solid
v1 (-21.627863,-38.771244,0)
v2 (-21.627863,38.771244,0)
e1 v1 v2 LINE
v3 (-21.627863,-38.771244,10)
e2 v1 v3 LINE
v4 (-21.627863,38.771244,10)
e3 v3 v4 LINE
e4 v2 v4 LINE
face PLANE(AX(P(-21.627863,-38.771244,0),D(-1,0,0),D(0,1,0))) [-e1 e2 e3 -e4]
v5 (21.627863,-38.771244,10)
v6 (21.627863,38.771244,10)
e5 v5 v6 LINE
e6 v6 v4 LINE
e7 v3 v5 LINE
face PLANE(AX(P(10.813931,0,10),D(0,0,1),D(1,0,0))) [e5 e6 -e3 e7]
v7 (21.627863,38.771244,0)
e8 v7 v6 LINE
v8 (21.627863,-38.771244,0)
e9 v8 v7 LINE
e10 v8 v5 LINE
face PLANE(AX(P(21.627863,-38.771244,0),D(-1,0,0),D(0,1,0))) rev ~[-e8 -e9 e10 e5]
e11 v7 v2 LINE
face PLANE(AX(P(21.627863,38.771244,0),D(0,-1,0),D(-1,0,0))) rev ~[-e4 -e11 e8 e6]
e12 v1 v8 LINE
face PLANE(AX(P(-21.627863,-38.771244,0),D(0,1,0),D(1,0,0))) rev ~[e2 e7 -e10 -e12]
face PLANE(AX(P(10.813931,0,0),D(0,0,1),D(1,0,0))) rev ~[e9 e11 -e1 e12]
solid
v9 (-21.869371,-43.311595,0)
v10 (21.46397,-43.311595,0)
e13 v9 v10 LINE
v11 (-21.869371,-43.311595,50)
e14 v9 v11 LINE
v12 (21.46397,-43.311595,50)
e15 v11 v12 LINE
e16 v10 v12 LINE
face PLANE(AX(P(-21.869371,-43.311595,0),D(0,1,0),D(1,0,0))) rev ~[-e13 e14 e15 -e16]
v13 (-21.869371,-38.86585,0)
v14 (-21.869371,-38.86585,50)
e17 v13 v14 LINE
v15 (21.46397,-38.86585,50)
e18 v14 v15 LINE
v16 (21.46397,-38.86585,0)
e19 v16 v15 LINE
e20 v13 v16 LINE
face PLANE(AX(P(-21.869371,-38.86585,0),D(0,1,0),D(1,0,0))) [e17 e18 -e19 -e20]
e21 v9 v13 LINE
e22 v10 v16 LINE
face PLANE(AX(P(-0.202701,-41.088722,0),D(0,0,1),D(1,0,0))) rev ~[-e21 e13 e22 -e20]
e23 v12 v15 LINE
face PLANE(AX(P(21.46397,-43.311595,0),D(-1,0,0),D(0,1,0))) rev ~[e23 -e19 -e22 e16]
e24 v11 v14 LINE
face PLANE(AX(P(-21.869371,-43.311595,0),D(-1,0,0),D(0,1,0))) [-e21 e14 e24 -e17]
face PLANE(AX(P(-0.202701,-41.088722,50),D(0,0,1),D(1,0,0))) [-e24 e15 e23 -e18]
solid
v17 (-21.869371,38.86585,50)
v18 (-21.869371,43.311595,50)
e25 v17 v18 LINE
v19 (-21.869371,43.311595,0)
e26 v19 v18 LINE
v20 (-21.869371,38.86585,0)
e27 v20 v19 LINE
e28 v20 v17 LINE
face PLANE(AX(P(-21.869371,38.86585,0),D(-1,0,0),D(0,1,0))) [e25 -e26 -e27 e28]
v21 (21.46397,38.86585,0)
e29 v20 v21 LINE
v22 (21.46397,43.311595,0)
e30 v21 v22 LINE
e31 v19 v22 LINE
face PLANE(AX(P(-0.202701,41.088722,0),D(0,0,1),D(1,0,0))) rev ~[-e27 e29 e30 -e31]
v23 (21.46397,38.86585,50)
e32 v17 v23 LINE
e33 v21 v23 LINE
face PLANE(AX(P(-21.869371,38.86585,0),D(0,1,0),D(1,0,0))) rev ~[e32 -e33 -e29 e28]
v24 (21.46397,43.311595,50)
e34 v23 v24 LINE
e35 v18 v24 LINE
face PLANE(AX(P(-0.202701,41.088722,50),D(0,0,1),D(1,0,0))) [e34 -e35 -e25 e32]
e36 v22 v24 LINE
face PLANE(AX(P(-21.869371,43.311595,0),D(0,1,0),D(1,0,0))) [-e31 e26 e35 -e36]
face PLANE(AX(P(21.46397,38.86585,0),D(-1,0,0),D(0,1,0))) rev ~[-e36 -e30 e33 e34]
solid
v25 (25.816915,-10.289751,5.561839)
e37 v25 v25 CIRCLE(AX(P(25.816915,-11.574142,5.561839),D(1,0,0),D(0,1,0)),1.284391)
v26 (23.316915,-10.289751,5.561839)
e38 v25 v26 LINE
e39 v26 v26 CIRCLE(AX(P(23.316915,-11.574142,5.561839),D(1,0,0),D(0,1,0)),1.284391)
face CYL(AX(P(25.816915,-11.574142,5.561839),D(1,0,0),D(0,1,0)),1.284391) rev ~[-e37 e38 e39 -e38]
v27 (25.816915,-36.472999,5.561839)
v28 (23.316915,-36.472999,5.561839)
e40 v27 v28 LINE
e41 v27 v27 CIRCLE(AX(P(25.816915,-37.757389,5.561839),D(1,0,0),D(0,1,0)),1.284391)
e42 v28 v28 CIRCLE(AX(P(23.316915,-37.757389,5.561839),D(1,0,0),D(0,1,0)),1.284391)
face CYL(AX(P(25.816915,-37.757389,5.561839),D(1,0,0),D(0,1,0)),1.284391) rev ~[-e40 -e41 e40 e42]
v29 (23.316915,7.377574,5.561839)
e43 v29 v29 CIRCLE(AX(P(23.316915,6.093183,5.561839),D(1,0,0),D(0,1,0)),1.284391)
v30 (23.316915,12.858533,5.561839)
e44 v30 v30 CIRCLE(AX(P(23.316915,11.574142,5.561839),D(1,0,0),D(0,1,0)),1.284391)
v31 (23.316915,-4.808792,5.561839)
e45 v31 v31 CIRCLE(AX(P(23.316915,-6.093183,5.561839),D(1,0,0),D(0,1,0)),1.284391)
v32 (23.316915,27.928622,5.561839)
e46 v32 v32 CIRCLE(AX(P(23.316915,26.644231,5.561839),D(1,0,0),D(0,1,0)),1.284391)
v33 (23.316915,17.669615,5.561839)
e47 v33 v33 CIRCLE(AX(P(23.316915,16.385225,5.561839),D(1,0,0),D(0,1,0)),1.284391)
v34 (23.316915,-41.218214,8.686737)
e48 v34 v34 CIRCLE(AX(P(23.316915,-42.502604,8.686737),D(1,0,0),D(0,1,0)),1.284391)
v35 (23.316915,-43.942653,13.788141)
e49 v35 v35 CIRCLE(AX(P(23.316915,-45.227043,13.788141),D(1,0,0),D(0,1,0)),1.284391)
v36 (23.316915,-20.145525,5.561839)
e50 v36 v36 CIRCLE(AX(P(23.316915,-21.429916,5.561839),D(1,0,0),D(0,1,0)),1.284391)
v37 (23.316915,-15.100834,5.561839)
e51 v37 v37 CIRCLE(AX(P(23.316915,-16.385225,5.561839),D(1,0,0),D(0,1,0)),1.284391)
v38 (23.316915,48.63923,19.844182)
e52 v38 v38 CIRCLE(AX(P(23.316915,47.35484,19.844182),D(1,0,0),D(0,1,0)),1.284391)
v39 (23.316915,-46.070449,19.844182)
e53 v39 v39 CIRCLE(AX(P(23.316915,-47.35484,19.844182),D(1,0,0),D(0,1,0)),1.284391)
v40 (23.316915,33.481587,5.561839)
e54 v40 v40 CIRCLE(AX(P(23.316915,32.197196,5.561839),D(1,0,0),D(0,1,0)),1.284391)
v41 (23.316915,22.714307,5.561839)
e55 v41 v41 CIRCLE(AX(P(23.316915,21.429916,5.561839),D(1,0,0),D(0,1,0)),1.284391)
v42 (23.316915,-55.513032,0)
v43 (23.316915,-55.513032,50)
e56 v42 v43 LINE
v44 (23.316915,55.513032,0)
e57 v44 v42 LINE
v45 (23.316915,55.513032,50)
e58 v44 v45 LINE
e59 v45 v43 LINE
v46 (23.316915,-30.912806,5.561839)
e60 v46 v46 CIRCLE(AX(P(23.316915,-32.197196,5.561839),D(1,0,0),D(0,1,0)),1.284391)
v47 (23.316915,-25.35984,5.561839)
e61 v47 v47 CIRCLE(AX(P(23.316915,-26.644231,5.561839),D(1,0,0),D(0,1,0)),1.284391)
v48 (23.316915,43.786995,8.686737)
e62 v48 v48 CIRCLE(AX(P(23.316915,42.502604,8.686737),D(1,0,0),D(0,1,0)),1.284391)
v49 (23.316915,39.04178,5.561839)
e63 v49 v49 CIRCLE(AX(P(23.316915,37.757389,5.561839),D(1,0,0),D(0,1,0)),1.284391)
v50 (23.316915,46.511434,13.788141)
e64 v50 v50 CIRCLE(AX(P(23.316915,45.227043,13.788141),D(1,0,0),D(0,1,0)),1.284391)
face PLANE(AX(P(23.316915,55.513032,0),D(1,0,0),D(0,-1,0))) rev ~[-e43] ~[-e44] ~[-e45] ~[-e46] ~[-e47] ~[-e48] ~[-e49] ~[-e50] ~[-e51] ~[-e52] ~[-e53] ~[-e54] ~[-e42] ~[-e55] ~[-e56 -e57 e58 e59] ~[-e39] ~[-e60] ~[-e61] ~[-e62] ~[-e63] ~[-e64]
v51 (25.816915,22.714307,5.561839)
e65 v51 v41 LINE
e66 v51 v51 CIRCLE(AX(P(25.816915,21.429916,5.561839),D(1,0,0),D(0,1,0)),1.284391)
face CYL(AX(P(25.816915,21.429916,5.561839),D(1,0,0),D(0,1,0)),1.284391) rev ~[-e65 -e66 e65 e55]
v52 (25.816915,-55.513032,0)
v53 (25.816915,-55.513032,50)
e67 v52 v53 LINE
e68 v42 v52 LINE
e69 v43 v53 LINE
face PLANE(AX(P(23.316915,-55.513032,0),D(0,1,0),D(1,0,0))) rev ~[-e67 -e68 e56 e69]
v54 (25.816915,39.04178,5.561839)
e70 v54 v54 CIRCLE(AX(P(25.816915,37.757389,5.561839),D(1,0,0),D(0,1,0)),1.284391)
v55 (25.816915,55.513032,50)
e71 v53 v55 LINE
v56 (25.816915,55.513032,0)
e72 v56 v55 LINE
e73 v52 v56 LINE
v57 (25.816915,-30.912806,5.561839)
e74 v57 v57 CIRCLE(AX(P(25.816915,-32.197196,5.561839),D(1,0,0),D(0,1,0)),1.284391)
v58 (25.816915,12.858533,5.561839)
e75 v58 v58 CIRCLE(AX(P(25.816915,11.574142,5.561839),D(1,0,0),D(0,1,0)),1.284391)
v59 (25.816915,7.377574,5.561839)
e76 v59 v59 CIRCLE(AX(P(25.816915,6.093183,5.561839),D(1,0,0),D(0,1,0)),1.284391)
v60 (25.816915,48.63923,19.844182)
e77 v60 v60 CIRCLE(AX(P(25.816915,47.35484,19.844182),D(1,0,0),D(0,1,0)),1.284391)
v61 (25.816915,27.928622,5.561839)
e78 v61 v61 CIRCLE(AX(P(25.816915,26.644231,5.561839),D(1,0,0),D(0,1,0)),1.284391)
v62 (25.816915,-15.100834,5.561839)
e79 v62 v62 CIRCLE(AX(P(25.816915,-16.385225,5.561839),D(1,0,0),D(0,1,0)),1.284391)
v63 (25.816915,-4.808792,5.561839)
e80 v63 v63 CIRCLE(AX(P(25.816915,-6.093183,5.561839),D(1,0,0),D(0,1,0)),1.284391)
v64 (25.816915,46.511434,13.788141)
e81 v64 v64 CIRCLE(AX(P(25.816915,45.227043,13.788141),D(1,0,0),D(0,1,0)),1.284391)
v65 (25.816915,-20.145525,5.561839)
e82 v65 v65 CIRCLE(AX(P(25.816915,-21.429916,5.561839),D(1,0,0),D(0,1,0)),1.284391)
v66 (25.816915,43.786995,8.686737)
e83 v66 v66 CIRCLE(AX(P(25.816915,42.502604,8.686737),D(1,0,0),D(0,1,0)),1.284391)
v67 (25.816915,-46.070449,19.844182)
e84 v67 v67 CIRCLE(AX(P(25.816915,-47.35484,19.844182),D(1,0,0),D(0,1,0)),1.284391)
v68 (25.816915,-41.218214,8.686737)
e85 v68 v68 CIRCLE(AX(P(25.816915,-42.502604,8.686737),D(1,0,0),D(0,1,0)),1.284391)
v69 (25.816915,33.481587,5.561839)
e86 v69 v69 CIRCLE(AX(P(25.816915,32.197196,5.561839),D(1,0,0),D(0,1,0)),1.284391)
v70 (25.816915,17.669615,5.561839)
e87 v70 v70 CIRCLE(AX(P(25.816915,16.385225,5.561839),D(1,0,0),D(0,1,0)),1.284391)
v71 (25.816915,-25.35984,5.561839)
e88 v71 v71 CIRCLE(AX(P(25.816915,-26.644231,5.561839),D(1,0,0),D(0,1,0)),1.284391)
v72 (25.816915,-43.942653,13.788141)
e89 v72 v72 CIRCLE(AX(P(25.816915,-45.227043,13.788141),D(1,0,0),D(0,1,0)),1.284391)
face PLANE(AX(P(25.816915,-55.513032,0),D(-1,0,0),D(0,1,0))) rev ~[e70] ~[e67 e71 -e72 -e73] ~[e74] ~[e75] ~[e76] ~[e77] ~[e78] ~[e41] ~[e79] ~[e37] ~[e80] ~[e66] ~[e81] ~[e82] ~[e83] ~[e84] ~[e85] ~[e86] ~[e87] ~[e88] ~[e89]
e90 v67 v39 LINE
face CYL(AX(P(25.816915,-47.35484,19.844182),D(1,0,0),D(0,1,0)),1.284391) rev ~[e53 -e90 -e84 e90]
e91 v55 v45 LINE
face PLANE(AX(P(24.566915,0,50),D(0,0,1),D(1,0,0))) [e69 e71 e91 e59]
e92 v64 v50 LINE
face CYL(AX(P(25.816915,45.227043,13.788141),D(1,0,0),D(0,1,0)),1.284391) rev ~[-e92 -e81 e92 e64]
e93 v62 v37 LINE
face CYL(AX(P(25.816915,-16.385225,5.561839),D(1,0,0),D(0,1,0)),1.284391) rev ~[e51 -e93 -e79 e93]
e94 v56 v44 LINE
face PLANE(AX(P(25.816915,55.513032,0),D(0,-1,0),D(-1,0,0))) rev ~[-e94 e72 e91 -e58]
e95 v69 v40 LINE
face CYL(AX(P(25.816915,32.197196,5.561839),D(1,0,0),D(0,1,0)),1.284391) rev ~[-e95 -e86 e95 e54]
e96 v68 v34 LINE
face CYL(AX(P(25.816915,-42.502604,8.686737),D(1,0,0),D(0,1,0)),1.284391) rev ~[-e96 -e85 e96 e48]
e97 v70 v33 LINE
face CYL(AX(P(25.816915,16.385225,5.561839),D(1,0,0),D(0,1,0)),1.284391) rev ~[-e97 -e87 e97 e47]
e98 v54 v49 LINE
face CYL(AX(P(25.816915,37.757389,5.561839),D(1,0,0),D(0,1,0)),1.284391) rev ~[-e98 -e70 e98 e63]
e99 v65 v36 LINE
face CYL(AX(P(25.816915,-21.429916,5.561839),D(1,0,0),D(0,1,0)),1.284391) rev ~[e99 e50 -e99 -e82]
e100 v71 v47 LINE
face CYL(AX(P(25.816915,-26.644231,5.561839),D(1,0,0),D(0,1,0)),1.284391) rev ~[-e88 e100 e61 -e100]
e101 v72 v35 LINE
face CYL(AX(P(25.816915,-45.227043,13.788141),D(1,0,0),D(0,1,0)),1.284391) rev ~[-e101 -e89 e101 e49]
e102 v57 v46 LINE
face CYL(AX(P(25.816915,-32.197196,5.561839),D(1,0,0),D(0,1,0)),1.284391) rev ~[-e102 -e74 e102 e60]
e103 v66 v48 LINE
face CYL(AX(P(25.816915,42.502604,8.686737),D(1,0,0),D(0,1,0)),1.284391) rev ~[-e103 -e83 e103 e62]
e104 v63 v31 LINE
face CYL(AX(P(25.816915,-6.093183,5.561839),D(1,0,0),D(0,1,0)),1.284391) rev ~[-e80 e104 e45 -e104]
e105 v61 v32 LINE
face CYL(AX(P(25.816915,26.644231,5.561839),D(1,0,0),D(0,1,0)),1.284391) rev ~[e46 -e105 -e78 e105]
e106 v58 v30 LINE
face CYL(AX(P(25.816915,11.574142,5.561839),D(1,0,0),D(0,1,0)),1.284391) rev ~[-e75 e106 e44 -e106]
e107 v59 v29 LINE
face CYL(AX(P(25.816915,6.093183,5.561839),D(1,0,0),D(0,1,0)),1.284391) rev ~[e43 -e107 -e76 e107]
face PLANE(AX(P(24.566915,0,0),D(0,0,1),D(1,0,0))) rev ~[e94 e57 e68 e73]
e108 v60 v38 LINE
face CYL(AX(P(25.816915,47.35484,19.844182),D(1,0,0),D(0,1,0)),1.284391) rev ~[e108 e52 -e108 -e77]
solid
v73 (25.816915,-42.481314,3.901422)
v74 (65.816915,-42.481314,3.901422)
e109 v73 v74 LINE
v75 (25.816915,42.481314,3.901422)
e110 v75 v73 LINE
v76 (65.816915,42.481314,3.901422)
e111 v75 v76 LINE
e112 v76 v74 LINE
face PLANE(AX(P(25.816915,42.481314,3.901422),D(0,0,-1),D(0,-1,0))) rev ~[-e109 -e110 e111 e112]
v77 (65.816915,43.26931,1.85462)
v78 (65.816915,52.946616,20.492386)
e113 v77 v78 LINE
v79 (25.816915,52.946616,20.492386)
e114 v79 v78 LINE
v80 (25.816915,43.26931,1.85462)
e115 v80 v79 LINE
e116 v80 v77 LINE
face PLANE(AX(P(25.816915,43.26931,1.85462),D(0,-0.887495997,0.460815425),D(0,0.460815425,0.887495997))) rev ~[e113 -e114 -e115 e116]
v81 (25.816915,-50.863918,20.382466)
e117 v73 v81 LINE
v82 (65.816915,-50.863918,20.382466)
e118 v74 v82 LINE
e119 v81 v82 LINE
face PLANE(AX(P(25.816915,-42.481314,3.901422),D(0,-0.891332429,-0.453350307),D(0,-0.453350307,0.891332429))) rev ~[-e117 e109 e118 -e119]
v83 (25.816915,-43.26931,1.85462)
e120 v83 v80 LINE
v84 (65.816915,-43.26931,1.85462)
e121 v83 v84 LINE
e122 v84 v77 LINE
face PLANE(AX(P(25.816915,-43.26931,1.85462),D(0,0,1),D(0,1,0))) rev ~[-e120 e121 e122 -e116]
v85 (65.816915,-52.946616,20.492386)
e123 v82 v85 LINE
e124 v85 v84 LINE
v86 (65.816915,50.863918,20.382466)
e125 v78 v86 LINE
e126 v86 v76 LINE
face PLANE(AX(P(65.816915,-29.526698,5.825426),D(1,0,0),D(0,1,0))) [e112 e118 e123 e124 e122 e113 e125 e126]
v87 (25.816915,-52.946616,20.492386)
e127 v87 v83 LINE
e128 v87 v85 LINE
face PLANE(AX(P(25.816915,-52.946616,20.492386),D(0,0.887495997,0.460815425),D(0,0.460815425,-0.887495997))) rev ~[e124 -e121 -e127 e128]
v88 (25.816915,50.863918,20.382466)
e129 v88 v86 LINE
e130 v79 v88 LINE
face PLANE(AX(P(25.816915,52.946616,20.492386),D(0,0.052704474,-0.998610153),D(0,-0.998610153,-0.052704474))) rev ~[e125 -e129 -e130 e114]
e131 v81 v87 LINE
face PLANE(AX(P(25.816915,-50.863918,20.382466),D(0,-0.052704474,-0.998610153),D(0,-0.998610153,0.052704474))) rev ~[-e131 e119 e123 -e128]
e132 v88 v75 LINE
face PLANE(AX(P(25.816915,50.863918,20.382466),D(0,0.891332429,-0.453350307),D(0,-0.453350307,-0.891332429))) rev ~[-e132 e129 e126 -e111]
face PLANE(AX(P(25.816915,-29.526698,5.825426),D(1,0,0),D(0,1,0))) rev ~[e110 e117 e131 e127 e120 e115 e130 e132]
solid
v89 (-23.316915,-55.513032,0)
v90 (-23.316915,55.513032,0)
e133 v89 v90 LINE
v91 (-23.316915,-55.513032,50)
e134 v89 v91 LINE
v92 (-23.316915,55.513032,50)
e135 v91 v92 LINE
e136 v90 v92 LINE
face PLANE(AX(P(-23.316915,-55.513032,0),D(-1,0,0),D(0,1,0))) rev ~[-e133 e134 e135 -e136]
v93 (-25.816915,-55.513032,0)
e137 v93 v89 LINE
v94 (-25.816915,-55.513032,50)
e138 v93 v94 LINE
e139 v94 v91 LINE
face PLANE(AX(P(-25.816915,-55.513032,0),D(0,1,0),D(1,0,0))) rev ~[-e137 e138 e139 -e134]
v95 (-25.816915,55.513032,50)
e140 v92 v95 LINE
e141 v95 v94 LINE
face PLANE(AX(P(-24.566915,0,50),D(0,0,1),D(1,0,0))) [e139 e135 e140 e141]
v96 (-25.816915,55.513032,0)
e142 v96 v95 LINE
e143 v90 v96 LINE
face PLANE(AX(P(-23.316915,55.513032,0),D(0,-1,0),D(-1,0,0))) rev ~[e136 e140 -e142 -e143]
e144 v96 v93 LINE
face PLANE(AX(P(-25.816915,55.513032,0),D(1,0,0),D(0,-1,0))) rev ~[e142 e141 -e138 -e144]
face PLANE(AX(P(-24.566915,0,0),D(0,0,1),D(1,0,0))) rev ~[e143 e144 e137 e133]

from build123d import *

# Parameters (mm, degrees)
F0_W     = 21.6278625545
F0_H     = 77.5424886208
F1_DEPTH = 10
F0_W_2   = 43.3333408518
F0_H_2   = 4.4457448224
F2_DEPTH = 50
F3_R     = 1.2843906964
F4_DEPTH = 25
F6_DEPTH = 40


with BuildPart() as f1:
    # F0 (on Top) → F1 (new body)
    with BuildSketch(Plane.XY):
        with Locations((10.8139312773, 0)):
            Rectangle(F0_W, F0_H)
        with Locations((-10.8139312773, 0)):
            Rectangle(F0_W, F0_H)
    extrude(amount=F1_DEPTH)


with BuildPart() as f2:
    # F0 (on Top) → F2 (new body)
    with BuildSketch(Plane.XY):
        with Locations((-0.2027006072, 41.0887222738)):
            Rectangle(F0_W_2, F0_H_2)
    extrude(amount=F2_DEPTH)


with BuildPart() as f2b:
    # F0 (on Top) → F2, piece 2 (new body)
    with BuildSketch(Plane.XY):
        Polygon((-23.3169149258, -47.1327573904), (-23.3169149258, 38.7712443104), (-23.3169149258, 47.1327573904), (-23.3169149258, 55.5130317807), (-25.8169149258, 55.5130317807), (-25.8169149258, 47.1327573904), (-25.8169149258, 38.7712443104), (-25.8169149258, -47.1327573904), (-25.8169149258, -55.5130317807), (-23.3169149258, -55.5130317807), align=None)
    extrude(amount=F2_DEPTH)


with BuildPart() as f2c:
    # F0 (on Top) → F2, piece 3 (new body)
    with BuildSketch(Plane.XY):
        Polygon((23.3169149258, 47.1327573904), (23.3169149258, 38.7712443104), (23.3169149258, -47.1327573904), (23.3169149258, -55.5130317807), (25.8169149258, -55.5130317807), (25.8169149258, -47.1327573904), (25.8169149258, 38.7712443104), (25.8169149258, 47.1327573904), (25.8169149258, 55.5130317807), (23.3169149258, 55.5130317807), align=None)
    extrude(amount=F2_DEPTH)

    # F3 (on face) → F4 (cut)
    with BuildSketch(Plane.YZ.offset(25.8169149258)):
        with Locations((-47.3548397422, 19.8441818357)):
            Circle(F3_R)
        with Locations((-45.2270433307, 13.7881413102)):
            Circle(F3_R)
        with Locations((-42.502604425, 8.6867371574)):
            Circle(F3_R)
        with Locations((-37.7573892474, 5.5618393235)):
            Circle(F3_R)
        with Locations((-32.1971963072, 5.5618393235)):
            Circle(F3_R)
        with Locations((-26.6442311032, 5.5618393235)):
            Circle(F3_R)
        with Locations((-21.4299158396, 5.5618393235)):
            Circle(F3_R)
        with Locations((-16.38522475, 5.5618393235)):
            Circle(F3_R)
        with Locations((-11.5741421781, 5.5618393235)):
            Circle(F3_R)
        with Locations((-6.0931830667, 5.5618393235)):
            Circle(F3_R)
        with Locations((6.0931830667, 5.5618393235)):
            Circle(F3_R)
        with Locations((11.5741421781, 5.5618393235)):
            Circle(F3_R)
        with Locations((16.38522475, 5.5618393235)):
            Circle(F3_R)
        with Locations((21.4299158396, 5.5618393235)):
            Circle(F3_R)
        with Locations((26.6442311032, 5.5618393235)):
            Circle(F3_R)
        with Locations((32.1971963072, 5.5618393235)):
            Circle(F3_R)
        with Locations((37.7573892474, 5.5618393235)):
            Circle(F3_R)
        with Locations((42.502604425, 8.6867371574)):
            Circle(F3_R)
        with Locations((45.2270433307, 13.7881413102)):
            Circle(F3_R)
        with Locations((47.3548397422, 19.8441818357)):
            Circle(F3_R)
    extrude(amount=-F4_DEPTH, mode=Mode.SUBTRACT)


with BuildPart() as f2d:
    # F0 (on Top) → F2, piece 4 (new body)
    with BuildSketch(Plane.XY):
        with Locations((-0.2027006072, -41.0887222738)):
            Rectangle(F0_W_2, F0_H_2)
    extrude(amount=F2_DEPTH)


with BuildPart() as f6:
    # F5 (on face) → F6 (new body)
    with BuildSketch(Plane.YZ.offset(25.8169149258)):
        Polygon((-42.4813143909, 3.9014217909), (-50.863917917, 20.3824657947), (-52.9466159642, 20.4923860729), (-43.2693101466, 1.8546198262), (0, 1.8546198262), (0, 3.9014217909), align=None)
        Polygon((42.4813143909, 3.9014217909), (0, 3.9014217909), (0, 1.8546198262), (43.2693101466, 1.8546198262), (52.9466159642, 20.4923860729), (50.863917917, 20.3824657947), align=None)
    extrude(amount=F6_DEPTH)


solid = Compound([f1.part, f2.part, f2b.part, f2c.part, f2d.part, f6.part])
